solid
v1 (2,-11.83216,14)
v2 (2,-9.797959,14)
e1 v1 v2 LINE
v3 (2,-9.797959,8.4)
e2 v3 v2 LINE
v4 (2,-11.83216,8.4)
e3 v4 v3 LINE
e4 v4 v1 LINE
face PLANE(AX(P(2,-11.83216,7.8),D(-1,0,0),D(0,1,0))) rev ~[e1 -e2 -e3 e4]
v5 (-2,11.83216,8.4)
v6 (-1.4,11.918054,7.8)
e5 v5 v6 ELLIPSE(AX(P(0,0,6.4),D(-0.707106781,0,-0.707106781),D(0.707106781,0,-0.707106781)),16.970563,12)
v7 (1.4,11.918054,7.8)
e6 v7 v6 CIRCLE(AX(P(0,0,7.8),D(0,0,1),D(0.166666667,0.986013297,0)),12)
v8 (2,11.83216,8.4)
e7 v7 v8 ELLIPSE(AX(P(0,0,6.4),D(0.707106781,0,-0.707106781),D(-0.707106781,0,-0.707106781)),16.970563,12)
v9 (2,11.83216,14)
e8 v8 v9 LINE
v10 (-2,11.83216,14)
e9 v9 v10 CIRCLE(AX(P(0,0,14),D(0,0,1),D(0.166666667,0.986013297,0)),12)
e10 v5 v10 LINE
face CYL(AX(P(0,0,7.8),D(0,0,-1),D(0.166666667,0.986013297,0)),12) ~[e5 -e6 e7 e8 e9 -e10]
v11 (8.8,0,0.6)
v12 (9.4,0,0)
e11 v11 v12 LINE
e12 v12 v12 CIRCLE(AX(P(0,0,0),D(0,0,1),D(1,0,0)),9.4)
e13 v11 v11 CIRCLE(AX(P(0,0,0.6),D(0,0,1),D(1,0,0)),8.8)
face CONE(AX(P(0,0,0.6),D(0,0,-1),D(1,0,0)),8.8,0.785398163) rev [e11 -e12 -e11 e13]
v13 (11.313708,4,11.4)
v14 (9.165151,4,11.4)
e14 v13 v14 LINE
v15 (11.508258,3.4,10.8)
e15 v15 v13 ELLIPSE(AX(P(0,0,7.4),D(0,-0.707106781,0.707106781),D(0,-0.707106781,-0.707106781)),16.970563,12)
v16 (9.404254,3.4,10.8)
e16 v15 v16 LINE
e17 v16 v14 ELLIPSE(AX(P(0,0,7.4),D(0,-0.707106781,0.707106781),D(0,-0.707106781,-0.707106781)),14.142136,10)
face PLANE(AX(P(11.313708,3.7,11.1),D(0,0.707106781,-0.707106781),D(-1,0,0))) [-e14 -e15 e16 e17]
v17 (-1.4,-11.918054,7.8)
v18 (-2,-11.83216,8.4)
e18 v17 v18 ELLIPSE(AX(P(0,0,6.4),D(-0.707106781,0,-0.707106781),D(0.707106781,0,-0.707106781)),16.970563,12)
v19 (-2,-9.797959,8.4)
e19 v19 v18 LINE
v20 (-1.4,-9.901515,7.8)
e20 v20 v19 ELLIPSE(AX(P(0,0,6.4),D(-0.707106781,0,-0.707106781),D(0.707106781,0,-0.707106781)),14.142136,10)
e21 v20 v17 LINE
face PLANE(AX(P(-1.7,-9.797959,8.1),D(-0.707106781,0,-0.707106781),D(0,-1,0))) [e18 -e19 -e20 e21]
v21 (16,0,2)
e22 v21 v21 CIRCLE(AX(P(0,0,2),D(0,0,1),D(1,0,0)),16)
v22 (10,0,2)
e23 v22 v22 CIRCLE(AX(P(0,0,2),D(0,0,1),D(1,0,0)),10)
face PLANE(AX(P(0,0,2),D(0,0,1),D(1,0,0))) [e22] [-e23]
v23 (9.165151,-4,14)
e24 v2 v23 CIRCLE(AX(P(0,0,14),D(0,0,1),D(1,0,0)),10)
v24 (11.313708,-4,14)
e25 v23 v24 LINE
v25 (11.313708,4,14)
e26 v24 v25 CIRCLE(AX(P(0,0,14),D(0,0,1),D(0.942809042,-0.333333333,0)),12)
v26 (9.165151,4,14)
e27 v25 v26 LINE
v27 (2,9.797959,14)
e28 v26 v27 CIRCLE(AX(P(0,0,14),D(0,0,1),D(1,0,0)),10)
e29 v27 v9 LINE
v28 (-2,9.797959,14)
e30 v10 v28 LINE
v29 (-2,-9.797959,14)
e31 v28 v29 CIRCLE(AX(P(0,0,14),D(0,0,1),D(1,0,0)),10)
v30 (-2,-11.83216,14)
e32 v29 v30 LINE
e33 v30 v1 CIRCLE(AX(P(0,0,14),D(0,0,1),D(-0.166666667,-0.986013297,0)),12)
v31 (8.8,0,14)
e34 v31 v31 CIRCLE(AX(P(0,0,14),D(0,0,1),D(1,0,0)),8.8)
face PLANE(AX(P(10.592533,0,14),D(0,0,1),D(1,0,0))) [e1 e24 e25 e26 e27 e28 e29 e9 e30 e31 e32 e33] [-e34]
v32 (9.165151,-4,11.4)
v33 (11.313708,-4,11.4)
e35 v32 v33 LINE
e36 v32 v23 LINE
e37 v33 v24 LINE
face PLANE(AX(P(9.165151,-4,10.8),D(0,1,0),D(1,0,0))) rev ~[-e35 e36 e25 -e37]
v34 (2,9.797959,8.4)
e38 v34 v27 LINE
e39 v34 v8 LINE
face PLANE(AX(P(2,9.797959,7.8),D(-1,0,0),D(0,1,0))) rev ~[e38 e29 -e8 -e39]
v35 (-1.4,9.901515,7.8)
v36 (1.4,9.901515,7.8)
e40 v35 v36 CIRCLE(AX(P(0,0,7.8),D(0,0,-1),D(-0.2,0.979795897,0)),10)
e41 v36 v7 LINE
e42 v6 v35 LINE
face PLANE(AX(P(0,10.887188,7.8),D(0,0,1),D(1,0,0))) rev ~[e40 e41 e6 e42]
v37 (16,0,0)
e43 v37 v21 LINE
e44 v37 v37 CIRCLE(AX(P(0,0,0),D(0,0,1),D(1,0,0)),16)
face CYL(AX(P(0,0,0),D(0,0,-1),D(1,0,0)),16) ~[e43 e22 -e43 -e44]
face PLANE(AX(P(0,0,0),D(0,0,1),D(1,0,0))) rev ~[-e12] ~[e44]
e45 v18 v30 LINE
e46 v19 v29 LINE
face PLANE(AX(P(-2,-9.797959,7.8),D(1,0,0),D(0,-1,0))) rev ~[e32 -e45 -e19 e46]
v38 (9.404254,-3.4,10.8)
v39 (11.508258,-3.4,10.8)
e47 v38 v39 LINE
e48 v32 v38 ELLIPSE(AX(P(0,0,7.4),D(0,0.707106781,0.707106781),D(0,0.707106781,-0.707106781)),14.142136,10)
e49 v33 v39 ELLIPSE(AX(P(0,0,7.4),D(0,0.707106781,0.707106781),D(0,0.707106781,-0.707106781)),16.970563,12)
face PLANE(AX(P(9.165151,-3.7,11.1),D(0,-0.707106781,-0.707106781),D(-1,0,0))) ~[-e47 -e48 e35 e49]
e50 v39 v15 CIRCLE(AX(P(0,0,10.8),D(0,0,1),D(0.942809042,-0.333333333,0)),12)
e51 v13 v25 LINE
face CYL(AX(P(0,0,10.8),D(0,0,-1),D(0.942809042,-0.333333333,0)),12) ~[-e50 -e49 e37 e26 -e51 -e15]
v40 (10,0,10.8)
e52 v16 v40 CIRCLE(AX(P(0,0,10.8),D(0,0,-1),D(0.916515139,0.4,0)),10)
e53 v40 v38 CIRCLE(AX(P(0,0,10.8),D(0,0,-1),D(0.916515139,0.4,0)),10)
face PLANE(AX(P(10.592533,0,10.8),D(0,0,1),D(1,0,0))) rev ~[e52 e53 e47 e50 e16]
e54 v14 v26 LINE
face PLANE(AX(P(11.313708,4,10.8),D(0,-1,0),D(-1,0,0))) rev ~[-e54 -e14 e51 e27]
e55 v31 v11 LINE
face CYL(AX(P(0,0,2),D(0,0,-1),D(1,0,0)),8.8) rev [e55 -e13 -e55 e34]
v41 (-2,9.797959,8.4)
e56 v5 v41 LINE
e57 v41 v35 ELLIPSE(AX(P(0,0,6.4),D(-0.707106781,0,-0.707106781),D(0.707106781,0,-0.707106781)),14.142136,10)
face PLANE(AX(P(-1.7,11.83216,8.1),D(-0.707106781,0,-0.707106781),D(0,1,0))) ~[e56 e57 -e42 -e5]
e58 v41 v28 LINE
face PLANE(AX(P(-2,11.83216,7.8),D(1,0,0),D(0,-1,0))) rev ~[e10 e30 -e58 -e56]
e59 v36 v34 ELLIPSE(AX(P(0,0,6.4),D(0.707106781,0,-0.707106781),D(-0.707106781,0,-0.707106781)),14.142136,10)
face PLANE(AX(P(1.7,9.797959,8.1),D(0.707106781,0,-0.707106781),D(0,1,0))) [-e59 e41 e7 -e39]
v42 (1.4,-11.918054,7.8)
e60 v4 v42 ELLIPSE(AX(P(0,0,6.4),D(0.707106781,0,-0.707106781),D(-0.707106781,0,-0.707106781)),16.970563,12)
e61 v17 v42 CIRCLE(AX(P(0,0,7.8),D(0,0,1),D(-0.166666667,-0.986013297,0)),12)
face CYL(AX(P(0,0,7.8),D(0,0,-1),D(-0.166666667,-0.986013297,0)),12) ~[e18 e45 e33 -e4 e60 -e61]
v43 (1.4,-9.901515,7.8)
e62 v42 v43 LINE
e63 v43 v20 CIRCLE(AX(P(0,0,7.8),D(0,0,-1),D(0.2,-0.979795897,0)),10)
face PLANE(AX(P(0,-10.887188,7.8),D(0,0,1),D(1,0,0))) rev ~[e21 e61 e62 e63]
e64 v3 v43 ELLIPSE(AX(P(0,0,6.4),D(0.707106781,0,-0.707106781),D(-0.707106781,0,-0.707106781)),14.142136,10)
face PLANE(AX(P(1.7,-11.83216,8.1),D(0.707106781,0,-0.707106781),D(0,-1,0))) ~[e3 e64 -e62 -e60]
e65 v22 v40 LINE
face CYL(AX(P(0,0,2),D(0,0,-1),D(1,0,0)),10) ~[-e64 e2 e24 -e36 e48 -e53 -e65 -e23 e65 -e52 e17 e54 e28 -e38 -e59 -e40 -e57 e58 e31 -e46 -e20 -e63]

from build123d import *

# Parameters (mm, degrees)
F0_R     = 16
F0_R_2   = 8.8
F1_DEPTH = 2
F2_R     = 10
F2_R_2   = 8.8
F3_DEPTH = 12
F6_DEPTH = 6.2
F9_DEPTH = 3.2
F10_SIZE = 0.6


with BuildPart() as f1:
    # F0 (on Top) → F1 (new body)
    with BuildSketch(Plane.XY):
        Circle(F0_R)
        Circle(F0_R_2, mode=Mode.SUBTRACT)
    extrude(amount=F1_DEPTH)

    # F2 (on face) → F3 (join)
    with BuildSketch(Plane.XY.offset(2)):
        Circle(F2_R)
        Circle(F2_R_2, mode=Mode.SUBTRACT)
    extrude(amount=F3_DEPTH)

    # F5 (on offset) → F6 (join, through all)
    with BuildSketch(Plane.XY.offset(7.8)):
        with BuildLine():
            Line((-2, -9.7979589711), (-2, -11.8321595662))
            ThreePointArc((-2, -11.8321595662), (0, -12), (2, -11.8321595662))
            Line((2, -11.8321595662), (2, -9.7979589711))
            ThreePointArc((2, -9.7979589711), (0, -10), (-2, -9.7979589711))
        make_face()
        with BuildLine():
            ThreePointArc((2, 11.8321595662), (0, 12), (-2, 11.8321595662))
            Line((-2, 11.8321595662), (-2, 9.7979589711))
            ThreePointArc((-2, 9.7979589711), (0, 10), (2, 9.7979589711))
            Line((2, 9.7979589711), (2, 11.8321595662))
        make_face()
    extrude(amount=F6_DEPTH)

    # F8 (on offset) → F9 (join, through all)
    with BuildSketch(Plane.XY.offset(10.8)):
        with BuildLine():
            ThreePointArc((9.1651513899, 4), (10, 0), (9.1651513899, -4))
            Line((9.1651513899, -4), (11.313708499, -4))
            ThreePointArc((11.313708499, -4), (12, 0), (11.313708499, 4))
            Line((11.313708499, 4), (9.1651513899, 4))
        make_face()
    extrude(amount=F9_DEPTH)

    # F10
    f10_edges = [f1.edges().sort_by_distance(p)[0] for p in [
        (-8.8, 0, 0),
        (-2, 10.815059, 7.8),
        (2, 10.815059, 7.8),
        (10.23943, 4, 10.8),
        (10.23943, -4, 10.8),
        (-2, -10.815059, 7.8),
        (2, -10.815059, 7.8),
    ]]
    chamfer(f10_edges, length=F10_SIZE)


solid = f1.part
